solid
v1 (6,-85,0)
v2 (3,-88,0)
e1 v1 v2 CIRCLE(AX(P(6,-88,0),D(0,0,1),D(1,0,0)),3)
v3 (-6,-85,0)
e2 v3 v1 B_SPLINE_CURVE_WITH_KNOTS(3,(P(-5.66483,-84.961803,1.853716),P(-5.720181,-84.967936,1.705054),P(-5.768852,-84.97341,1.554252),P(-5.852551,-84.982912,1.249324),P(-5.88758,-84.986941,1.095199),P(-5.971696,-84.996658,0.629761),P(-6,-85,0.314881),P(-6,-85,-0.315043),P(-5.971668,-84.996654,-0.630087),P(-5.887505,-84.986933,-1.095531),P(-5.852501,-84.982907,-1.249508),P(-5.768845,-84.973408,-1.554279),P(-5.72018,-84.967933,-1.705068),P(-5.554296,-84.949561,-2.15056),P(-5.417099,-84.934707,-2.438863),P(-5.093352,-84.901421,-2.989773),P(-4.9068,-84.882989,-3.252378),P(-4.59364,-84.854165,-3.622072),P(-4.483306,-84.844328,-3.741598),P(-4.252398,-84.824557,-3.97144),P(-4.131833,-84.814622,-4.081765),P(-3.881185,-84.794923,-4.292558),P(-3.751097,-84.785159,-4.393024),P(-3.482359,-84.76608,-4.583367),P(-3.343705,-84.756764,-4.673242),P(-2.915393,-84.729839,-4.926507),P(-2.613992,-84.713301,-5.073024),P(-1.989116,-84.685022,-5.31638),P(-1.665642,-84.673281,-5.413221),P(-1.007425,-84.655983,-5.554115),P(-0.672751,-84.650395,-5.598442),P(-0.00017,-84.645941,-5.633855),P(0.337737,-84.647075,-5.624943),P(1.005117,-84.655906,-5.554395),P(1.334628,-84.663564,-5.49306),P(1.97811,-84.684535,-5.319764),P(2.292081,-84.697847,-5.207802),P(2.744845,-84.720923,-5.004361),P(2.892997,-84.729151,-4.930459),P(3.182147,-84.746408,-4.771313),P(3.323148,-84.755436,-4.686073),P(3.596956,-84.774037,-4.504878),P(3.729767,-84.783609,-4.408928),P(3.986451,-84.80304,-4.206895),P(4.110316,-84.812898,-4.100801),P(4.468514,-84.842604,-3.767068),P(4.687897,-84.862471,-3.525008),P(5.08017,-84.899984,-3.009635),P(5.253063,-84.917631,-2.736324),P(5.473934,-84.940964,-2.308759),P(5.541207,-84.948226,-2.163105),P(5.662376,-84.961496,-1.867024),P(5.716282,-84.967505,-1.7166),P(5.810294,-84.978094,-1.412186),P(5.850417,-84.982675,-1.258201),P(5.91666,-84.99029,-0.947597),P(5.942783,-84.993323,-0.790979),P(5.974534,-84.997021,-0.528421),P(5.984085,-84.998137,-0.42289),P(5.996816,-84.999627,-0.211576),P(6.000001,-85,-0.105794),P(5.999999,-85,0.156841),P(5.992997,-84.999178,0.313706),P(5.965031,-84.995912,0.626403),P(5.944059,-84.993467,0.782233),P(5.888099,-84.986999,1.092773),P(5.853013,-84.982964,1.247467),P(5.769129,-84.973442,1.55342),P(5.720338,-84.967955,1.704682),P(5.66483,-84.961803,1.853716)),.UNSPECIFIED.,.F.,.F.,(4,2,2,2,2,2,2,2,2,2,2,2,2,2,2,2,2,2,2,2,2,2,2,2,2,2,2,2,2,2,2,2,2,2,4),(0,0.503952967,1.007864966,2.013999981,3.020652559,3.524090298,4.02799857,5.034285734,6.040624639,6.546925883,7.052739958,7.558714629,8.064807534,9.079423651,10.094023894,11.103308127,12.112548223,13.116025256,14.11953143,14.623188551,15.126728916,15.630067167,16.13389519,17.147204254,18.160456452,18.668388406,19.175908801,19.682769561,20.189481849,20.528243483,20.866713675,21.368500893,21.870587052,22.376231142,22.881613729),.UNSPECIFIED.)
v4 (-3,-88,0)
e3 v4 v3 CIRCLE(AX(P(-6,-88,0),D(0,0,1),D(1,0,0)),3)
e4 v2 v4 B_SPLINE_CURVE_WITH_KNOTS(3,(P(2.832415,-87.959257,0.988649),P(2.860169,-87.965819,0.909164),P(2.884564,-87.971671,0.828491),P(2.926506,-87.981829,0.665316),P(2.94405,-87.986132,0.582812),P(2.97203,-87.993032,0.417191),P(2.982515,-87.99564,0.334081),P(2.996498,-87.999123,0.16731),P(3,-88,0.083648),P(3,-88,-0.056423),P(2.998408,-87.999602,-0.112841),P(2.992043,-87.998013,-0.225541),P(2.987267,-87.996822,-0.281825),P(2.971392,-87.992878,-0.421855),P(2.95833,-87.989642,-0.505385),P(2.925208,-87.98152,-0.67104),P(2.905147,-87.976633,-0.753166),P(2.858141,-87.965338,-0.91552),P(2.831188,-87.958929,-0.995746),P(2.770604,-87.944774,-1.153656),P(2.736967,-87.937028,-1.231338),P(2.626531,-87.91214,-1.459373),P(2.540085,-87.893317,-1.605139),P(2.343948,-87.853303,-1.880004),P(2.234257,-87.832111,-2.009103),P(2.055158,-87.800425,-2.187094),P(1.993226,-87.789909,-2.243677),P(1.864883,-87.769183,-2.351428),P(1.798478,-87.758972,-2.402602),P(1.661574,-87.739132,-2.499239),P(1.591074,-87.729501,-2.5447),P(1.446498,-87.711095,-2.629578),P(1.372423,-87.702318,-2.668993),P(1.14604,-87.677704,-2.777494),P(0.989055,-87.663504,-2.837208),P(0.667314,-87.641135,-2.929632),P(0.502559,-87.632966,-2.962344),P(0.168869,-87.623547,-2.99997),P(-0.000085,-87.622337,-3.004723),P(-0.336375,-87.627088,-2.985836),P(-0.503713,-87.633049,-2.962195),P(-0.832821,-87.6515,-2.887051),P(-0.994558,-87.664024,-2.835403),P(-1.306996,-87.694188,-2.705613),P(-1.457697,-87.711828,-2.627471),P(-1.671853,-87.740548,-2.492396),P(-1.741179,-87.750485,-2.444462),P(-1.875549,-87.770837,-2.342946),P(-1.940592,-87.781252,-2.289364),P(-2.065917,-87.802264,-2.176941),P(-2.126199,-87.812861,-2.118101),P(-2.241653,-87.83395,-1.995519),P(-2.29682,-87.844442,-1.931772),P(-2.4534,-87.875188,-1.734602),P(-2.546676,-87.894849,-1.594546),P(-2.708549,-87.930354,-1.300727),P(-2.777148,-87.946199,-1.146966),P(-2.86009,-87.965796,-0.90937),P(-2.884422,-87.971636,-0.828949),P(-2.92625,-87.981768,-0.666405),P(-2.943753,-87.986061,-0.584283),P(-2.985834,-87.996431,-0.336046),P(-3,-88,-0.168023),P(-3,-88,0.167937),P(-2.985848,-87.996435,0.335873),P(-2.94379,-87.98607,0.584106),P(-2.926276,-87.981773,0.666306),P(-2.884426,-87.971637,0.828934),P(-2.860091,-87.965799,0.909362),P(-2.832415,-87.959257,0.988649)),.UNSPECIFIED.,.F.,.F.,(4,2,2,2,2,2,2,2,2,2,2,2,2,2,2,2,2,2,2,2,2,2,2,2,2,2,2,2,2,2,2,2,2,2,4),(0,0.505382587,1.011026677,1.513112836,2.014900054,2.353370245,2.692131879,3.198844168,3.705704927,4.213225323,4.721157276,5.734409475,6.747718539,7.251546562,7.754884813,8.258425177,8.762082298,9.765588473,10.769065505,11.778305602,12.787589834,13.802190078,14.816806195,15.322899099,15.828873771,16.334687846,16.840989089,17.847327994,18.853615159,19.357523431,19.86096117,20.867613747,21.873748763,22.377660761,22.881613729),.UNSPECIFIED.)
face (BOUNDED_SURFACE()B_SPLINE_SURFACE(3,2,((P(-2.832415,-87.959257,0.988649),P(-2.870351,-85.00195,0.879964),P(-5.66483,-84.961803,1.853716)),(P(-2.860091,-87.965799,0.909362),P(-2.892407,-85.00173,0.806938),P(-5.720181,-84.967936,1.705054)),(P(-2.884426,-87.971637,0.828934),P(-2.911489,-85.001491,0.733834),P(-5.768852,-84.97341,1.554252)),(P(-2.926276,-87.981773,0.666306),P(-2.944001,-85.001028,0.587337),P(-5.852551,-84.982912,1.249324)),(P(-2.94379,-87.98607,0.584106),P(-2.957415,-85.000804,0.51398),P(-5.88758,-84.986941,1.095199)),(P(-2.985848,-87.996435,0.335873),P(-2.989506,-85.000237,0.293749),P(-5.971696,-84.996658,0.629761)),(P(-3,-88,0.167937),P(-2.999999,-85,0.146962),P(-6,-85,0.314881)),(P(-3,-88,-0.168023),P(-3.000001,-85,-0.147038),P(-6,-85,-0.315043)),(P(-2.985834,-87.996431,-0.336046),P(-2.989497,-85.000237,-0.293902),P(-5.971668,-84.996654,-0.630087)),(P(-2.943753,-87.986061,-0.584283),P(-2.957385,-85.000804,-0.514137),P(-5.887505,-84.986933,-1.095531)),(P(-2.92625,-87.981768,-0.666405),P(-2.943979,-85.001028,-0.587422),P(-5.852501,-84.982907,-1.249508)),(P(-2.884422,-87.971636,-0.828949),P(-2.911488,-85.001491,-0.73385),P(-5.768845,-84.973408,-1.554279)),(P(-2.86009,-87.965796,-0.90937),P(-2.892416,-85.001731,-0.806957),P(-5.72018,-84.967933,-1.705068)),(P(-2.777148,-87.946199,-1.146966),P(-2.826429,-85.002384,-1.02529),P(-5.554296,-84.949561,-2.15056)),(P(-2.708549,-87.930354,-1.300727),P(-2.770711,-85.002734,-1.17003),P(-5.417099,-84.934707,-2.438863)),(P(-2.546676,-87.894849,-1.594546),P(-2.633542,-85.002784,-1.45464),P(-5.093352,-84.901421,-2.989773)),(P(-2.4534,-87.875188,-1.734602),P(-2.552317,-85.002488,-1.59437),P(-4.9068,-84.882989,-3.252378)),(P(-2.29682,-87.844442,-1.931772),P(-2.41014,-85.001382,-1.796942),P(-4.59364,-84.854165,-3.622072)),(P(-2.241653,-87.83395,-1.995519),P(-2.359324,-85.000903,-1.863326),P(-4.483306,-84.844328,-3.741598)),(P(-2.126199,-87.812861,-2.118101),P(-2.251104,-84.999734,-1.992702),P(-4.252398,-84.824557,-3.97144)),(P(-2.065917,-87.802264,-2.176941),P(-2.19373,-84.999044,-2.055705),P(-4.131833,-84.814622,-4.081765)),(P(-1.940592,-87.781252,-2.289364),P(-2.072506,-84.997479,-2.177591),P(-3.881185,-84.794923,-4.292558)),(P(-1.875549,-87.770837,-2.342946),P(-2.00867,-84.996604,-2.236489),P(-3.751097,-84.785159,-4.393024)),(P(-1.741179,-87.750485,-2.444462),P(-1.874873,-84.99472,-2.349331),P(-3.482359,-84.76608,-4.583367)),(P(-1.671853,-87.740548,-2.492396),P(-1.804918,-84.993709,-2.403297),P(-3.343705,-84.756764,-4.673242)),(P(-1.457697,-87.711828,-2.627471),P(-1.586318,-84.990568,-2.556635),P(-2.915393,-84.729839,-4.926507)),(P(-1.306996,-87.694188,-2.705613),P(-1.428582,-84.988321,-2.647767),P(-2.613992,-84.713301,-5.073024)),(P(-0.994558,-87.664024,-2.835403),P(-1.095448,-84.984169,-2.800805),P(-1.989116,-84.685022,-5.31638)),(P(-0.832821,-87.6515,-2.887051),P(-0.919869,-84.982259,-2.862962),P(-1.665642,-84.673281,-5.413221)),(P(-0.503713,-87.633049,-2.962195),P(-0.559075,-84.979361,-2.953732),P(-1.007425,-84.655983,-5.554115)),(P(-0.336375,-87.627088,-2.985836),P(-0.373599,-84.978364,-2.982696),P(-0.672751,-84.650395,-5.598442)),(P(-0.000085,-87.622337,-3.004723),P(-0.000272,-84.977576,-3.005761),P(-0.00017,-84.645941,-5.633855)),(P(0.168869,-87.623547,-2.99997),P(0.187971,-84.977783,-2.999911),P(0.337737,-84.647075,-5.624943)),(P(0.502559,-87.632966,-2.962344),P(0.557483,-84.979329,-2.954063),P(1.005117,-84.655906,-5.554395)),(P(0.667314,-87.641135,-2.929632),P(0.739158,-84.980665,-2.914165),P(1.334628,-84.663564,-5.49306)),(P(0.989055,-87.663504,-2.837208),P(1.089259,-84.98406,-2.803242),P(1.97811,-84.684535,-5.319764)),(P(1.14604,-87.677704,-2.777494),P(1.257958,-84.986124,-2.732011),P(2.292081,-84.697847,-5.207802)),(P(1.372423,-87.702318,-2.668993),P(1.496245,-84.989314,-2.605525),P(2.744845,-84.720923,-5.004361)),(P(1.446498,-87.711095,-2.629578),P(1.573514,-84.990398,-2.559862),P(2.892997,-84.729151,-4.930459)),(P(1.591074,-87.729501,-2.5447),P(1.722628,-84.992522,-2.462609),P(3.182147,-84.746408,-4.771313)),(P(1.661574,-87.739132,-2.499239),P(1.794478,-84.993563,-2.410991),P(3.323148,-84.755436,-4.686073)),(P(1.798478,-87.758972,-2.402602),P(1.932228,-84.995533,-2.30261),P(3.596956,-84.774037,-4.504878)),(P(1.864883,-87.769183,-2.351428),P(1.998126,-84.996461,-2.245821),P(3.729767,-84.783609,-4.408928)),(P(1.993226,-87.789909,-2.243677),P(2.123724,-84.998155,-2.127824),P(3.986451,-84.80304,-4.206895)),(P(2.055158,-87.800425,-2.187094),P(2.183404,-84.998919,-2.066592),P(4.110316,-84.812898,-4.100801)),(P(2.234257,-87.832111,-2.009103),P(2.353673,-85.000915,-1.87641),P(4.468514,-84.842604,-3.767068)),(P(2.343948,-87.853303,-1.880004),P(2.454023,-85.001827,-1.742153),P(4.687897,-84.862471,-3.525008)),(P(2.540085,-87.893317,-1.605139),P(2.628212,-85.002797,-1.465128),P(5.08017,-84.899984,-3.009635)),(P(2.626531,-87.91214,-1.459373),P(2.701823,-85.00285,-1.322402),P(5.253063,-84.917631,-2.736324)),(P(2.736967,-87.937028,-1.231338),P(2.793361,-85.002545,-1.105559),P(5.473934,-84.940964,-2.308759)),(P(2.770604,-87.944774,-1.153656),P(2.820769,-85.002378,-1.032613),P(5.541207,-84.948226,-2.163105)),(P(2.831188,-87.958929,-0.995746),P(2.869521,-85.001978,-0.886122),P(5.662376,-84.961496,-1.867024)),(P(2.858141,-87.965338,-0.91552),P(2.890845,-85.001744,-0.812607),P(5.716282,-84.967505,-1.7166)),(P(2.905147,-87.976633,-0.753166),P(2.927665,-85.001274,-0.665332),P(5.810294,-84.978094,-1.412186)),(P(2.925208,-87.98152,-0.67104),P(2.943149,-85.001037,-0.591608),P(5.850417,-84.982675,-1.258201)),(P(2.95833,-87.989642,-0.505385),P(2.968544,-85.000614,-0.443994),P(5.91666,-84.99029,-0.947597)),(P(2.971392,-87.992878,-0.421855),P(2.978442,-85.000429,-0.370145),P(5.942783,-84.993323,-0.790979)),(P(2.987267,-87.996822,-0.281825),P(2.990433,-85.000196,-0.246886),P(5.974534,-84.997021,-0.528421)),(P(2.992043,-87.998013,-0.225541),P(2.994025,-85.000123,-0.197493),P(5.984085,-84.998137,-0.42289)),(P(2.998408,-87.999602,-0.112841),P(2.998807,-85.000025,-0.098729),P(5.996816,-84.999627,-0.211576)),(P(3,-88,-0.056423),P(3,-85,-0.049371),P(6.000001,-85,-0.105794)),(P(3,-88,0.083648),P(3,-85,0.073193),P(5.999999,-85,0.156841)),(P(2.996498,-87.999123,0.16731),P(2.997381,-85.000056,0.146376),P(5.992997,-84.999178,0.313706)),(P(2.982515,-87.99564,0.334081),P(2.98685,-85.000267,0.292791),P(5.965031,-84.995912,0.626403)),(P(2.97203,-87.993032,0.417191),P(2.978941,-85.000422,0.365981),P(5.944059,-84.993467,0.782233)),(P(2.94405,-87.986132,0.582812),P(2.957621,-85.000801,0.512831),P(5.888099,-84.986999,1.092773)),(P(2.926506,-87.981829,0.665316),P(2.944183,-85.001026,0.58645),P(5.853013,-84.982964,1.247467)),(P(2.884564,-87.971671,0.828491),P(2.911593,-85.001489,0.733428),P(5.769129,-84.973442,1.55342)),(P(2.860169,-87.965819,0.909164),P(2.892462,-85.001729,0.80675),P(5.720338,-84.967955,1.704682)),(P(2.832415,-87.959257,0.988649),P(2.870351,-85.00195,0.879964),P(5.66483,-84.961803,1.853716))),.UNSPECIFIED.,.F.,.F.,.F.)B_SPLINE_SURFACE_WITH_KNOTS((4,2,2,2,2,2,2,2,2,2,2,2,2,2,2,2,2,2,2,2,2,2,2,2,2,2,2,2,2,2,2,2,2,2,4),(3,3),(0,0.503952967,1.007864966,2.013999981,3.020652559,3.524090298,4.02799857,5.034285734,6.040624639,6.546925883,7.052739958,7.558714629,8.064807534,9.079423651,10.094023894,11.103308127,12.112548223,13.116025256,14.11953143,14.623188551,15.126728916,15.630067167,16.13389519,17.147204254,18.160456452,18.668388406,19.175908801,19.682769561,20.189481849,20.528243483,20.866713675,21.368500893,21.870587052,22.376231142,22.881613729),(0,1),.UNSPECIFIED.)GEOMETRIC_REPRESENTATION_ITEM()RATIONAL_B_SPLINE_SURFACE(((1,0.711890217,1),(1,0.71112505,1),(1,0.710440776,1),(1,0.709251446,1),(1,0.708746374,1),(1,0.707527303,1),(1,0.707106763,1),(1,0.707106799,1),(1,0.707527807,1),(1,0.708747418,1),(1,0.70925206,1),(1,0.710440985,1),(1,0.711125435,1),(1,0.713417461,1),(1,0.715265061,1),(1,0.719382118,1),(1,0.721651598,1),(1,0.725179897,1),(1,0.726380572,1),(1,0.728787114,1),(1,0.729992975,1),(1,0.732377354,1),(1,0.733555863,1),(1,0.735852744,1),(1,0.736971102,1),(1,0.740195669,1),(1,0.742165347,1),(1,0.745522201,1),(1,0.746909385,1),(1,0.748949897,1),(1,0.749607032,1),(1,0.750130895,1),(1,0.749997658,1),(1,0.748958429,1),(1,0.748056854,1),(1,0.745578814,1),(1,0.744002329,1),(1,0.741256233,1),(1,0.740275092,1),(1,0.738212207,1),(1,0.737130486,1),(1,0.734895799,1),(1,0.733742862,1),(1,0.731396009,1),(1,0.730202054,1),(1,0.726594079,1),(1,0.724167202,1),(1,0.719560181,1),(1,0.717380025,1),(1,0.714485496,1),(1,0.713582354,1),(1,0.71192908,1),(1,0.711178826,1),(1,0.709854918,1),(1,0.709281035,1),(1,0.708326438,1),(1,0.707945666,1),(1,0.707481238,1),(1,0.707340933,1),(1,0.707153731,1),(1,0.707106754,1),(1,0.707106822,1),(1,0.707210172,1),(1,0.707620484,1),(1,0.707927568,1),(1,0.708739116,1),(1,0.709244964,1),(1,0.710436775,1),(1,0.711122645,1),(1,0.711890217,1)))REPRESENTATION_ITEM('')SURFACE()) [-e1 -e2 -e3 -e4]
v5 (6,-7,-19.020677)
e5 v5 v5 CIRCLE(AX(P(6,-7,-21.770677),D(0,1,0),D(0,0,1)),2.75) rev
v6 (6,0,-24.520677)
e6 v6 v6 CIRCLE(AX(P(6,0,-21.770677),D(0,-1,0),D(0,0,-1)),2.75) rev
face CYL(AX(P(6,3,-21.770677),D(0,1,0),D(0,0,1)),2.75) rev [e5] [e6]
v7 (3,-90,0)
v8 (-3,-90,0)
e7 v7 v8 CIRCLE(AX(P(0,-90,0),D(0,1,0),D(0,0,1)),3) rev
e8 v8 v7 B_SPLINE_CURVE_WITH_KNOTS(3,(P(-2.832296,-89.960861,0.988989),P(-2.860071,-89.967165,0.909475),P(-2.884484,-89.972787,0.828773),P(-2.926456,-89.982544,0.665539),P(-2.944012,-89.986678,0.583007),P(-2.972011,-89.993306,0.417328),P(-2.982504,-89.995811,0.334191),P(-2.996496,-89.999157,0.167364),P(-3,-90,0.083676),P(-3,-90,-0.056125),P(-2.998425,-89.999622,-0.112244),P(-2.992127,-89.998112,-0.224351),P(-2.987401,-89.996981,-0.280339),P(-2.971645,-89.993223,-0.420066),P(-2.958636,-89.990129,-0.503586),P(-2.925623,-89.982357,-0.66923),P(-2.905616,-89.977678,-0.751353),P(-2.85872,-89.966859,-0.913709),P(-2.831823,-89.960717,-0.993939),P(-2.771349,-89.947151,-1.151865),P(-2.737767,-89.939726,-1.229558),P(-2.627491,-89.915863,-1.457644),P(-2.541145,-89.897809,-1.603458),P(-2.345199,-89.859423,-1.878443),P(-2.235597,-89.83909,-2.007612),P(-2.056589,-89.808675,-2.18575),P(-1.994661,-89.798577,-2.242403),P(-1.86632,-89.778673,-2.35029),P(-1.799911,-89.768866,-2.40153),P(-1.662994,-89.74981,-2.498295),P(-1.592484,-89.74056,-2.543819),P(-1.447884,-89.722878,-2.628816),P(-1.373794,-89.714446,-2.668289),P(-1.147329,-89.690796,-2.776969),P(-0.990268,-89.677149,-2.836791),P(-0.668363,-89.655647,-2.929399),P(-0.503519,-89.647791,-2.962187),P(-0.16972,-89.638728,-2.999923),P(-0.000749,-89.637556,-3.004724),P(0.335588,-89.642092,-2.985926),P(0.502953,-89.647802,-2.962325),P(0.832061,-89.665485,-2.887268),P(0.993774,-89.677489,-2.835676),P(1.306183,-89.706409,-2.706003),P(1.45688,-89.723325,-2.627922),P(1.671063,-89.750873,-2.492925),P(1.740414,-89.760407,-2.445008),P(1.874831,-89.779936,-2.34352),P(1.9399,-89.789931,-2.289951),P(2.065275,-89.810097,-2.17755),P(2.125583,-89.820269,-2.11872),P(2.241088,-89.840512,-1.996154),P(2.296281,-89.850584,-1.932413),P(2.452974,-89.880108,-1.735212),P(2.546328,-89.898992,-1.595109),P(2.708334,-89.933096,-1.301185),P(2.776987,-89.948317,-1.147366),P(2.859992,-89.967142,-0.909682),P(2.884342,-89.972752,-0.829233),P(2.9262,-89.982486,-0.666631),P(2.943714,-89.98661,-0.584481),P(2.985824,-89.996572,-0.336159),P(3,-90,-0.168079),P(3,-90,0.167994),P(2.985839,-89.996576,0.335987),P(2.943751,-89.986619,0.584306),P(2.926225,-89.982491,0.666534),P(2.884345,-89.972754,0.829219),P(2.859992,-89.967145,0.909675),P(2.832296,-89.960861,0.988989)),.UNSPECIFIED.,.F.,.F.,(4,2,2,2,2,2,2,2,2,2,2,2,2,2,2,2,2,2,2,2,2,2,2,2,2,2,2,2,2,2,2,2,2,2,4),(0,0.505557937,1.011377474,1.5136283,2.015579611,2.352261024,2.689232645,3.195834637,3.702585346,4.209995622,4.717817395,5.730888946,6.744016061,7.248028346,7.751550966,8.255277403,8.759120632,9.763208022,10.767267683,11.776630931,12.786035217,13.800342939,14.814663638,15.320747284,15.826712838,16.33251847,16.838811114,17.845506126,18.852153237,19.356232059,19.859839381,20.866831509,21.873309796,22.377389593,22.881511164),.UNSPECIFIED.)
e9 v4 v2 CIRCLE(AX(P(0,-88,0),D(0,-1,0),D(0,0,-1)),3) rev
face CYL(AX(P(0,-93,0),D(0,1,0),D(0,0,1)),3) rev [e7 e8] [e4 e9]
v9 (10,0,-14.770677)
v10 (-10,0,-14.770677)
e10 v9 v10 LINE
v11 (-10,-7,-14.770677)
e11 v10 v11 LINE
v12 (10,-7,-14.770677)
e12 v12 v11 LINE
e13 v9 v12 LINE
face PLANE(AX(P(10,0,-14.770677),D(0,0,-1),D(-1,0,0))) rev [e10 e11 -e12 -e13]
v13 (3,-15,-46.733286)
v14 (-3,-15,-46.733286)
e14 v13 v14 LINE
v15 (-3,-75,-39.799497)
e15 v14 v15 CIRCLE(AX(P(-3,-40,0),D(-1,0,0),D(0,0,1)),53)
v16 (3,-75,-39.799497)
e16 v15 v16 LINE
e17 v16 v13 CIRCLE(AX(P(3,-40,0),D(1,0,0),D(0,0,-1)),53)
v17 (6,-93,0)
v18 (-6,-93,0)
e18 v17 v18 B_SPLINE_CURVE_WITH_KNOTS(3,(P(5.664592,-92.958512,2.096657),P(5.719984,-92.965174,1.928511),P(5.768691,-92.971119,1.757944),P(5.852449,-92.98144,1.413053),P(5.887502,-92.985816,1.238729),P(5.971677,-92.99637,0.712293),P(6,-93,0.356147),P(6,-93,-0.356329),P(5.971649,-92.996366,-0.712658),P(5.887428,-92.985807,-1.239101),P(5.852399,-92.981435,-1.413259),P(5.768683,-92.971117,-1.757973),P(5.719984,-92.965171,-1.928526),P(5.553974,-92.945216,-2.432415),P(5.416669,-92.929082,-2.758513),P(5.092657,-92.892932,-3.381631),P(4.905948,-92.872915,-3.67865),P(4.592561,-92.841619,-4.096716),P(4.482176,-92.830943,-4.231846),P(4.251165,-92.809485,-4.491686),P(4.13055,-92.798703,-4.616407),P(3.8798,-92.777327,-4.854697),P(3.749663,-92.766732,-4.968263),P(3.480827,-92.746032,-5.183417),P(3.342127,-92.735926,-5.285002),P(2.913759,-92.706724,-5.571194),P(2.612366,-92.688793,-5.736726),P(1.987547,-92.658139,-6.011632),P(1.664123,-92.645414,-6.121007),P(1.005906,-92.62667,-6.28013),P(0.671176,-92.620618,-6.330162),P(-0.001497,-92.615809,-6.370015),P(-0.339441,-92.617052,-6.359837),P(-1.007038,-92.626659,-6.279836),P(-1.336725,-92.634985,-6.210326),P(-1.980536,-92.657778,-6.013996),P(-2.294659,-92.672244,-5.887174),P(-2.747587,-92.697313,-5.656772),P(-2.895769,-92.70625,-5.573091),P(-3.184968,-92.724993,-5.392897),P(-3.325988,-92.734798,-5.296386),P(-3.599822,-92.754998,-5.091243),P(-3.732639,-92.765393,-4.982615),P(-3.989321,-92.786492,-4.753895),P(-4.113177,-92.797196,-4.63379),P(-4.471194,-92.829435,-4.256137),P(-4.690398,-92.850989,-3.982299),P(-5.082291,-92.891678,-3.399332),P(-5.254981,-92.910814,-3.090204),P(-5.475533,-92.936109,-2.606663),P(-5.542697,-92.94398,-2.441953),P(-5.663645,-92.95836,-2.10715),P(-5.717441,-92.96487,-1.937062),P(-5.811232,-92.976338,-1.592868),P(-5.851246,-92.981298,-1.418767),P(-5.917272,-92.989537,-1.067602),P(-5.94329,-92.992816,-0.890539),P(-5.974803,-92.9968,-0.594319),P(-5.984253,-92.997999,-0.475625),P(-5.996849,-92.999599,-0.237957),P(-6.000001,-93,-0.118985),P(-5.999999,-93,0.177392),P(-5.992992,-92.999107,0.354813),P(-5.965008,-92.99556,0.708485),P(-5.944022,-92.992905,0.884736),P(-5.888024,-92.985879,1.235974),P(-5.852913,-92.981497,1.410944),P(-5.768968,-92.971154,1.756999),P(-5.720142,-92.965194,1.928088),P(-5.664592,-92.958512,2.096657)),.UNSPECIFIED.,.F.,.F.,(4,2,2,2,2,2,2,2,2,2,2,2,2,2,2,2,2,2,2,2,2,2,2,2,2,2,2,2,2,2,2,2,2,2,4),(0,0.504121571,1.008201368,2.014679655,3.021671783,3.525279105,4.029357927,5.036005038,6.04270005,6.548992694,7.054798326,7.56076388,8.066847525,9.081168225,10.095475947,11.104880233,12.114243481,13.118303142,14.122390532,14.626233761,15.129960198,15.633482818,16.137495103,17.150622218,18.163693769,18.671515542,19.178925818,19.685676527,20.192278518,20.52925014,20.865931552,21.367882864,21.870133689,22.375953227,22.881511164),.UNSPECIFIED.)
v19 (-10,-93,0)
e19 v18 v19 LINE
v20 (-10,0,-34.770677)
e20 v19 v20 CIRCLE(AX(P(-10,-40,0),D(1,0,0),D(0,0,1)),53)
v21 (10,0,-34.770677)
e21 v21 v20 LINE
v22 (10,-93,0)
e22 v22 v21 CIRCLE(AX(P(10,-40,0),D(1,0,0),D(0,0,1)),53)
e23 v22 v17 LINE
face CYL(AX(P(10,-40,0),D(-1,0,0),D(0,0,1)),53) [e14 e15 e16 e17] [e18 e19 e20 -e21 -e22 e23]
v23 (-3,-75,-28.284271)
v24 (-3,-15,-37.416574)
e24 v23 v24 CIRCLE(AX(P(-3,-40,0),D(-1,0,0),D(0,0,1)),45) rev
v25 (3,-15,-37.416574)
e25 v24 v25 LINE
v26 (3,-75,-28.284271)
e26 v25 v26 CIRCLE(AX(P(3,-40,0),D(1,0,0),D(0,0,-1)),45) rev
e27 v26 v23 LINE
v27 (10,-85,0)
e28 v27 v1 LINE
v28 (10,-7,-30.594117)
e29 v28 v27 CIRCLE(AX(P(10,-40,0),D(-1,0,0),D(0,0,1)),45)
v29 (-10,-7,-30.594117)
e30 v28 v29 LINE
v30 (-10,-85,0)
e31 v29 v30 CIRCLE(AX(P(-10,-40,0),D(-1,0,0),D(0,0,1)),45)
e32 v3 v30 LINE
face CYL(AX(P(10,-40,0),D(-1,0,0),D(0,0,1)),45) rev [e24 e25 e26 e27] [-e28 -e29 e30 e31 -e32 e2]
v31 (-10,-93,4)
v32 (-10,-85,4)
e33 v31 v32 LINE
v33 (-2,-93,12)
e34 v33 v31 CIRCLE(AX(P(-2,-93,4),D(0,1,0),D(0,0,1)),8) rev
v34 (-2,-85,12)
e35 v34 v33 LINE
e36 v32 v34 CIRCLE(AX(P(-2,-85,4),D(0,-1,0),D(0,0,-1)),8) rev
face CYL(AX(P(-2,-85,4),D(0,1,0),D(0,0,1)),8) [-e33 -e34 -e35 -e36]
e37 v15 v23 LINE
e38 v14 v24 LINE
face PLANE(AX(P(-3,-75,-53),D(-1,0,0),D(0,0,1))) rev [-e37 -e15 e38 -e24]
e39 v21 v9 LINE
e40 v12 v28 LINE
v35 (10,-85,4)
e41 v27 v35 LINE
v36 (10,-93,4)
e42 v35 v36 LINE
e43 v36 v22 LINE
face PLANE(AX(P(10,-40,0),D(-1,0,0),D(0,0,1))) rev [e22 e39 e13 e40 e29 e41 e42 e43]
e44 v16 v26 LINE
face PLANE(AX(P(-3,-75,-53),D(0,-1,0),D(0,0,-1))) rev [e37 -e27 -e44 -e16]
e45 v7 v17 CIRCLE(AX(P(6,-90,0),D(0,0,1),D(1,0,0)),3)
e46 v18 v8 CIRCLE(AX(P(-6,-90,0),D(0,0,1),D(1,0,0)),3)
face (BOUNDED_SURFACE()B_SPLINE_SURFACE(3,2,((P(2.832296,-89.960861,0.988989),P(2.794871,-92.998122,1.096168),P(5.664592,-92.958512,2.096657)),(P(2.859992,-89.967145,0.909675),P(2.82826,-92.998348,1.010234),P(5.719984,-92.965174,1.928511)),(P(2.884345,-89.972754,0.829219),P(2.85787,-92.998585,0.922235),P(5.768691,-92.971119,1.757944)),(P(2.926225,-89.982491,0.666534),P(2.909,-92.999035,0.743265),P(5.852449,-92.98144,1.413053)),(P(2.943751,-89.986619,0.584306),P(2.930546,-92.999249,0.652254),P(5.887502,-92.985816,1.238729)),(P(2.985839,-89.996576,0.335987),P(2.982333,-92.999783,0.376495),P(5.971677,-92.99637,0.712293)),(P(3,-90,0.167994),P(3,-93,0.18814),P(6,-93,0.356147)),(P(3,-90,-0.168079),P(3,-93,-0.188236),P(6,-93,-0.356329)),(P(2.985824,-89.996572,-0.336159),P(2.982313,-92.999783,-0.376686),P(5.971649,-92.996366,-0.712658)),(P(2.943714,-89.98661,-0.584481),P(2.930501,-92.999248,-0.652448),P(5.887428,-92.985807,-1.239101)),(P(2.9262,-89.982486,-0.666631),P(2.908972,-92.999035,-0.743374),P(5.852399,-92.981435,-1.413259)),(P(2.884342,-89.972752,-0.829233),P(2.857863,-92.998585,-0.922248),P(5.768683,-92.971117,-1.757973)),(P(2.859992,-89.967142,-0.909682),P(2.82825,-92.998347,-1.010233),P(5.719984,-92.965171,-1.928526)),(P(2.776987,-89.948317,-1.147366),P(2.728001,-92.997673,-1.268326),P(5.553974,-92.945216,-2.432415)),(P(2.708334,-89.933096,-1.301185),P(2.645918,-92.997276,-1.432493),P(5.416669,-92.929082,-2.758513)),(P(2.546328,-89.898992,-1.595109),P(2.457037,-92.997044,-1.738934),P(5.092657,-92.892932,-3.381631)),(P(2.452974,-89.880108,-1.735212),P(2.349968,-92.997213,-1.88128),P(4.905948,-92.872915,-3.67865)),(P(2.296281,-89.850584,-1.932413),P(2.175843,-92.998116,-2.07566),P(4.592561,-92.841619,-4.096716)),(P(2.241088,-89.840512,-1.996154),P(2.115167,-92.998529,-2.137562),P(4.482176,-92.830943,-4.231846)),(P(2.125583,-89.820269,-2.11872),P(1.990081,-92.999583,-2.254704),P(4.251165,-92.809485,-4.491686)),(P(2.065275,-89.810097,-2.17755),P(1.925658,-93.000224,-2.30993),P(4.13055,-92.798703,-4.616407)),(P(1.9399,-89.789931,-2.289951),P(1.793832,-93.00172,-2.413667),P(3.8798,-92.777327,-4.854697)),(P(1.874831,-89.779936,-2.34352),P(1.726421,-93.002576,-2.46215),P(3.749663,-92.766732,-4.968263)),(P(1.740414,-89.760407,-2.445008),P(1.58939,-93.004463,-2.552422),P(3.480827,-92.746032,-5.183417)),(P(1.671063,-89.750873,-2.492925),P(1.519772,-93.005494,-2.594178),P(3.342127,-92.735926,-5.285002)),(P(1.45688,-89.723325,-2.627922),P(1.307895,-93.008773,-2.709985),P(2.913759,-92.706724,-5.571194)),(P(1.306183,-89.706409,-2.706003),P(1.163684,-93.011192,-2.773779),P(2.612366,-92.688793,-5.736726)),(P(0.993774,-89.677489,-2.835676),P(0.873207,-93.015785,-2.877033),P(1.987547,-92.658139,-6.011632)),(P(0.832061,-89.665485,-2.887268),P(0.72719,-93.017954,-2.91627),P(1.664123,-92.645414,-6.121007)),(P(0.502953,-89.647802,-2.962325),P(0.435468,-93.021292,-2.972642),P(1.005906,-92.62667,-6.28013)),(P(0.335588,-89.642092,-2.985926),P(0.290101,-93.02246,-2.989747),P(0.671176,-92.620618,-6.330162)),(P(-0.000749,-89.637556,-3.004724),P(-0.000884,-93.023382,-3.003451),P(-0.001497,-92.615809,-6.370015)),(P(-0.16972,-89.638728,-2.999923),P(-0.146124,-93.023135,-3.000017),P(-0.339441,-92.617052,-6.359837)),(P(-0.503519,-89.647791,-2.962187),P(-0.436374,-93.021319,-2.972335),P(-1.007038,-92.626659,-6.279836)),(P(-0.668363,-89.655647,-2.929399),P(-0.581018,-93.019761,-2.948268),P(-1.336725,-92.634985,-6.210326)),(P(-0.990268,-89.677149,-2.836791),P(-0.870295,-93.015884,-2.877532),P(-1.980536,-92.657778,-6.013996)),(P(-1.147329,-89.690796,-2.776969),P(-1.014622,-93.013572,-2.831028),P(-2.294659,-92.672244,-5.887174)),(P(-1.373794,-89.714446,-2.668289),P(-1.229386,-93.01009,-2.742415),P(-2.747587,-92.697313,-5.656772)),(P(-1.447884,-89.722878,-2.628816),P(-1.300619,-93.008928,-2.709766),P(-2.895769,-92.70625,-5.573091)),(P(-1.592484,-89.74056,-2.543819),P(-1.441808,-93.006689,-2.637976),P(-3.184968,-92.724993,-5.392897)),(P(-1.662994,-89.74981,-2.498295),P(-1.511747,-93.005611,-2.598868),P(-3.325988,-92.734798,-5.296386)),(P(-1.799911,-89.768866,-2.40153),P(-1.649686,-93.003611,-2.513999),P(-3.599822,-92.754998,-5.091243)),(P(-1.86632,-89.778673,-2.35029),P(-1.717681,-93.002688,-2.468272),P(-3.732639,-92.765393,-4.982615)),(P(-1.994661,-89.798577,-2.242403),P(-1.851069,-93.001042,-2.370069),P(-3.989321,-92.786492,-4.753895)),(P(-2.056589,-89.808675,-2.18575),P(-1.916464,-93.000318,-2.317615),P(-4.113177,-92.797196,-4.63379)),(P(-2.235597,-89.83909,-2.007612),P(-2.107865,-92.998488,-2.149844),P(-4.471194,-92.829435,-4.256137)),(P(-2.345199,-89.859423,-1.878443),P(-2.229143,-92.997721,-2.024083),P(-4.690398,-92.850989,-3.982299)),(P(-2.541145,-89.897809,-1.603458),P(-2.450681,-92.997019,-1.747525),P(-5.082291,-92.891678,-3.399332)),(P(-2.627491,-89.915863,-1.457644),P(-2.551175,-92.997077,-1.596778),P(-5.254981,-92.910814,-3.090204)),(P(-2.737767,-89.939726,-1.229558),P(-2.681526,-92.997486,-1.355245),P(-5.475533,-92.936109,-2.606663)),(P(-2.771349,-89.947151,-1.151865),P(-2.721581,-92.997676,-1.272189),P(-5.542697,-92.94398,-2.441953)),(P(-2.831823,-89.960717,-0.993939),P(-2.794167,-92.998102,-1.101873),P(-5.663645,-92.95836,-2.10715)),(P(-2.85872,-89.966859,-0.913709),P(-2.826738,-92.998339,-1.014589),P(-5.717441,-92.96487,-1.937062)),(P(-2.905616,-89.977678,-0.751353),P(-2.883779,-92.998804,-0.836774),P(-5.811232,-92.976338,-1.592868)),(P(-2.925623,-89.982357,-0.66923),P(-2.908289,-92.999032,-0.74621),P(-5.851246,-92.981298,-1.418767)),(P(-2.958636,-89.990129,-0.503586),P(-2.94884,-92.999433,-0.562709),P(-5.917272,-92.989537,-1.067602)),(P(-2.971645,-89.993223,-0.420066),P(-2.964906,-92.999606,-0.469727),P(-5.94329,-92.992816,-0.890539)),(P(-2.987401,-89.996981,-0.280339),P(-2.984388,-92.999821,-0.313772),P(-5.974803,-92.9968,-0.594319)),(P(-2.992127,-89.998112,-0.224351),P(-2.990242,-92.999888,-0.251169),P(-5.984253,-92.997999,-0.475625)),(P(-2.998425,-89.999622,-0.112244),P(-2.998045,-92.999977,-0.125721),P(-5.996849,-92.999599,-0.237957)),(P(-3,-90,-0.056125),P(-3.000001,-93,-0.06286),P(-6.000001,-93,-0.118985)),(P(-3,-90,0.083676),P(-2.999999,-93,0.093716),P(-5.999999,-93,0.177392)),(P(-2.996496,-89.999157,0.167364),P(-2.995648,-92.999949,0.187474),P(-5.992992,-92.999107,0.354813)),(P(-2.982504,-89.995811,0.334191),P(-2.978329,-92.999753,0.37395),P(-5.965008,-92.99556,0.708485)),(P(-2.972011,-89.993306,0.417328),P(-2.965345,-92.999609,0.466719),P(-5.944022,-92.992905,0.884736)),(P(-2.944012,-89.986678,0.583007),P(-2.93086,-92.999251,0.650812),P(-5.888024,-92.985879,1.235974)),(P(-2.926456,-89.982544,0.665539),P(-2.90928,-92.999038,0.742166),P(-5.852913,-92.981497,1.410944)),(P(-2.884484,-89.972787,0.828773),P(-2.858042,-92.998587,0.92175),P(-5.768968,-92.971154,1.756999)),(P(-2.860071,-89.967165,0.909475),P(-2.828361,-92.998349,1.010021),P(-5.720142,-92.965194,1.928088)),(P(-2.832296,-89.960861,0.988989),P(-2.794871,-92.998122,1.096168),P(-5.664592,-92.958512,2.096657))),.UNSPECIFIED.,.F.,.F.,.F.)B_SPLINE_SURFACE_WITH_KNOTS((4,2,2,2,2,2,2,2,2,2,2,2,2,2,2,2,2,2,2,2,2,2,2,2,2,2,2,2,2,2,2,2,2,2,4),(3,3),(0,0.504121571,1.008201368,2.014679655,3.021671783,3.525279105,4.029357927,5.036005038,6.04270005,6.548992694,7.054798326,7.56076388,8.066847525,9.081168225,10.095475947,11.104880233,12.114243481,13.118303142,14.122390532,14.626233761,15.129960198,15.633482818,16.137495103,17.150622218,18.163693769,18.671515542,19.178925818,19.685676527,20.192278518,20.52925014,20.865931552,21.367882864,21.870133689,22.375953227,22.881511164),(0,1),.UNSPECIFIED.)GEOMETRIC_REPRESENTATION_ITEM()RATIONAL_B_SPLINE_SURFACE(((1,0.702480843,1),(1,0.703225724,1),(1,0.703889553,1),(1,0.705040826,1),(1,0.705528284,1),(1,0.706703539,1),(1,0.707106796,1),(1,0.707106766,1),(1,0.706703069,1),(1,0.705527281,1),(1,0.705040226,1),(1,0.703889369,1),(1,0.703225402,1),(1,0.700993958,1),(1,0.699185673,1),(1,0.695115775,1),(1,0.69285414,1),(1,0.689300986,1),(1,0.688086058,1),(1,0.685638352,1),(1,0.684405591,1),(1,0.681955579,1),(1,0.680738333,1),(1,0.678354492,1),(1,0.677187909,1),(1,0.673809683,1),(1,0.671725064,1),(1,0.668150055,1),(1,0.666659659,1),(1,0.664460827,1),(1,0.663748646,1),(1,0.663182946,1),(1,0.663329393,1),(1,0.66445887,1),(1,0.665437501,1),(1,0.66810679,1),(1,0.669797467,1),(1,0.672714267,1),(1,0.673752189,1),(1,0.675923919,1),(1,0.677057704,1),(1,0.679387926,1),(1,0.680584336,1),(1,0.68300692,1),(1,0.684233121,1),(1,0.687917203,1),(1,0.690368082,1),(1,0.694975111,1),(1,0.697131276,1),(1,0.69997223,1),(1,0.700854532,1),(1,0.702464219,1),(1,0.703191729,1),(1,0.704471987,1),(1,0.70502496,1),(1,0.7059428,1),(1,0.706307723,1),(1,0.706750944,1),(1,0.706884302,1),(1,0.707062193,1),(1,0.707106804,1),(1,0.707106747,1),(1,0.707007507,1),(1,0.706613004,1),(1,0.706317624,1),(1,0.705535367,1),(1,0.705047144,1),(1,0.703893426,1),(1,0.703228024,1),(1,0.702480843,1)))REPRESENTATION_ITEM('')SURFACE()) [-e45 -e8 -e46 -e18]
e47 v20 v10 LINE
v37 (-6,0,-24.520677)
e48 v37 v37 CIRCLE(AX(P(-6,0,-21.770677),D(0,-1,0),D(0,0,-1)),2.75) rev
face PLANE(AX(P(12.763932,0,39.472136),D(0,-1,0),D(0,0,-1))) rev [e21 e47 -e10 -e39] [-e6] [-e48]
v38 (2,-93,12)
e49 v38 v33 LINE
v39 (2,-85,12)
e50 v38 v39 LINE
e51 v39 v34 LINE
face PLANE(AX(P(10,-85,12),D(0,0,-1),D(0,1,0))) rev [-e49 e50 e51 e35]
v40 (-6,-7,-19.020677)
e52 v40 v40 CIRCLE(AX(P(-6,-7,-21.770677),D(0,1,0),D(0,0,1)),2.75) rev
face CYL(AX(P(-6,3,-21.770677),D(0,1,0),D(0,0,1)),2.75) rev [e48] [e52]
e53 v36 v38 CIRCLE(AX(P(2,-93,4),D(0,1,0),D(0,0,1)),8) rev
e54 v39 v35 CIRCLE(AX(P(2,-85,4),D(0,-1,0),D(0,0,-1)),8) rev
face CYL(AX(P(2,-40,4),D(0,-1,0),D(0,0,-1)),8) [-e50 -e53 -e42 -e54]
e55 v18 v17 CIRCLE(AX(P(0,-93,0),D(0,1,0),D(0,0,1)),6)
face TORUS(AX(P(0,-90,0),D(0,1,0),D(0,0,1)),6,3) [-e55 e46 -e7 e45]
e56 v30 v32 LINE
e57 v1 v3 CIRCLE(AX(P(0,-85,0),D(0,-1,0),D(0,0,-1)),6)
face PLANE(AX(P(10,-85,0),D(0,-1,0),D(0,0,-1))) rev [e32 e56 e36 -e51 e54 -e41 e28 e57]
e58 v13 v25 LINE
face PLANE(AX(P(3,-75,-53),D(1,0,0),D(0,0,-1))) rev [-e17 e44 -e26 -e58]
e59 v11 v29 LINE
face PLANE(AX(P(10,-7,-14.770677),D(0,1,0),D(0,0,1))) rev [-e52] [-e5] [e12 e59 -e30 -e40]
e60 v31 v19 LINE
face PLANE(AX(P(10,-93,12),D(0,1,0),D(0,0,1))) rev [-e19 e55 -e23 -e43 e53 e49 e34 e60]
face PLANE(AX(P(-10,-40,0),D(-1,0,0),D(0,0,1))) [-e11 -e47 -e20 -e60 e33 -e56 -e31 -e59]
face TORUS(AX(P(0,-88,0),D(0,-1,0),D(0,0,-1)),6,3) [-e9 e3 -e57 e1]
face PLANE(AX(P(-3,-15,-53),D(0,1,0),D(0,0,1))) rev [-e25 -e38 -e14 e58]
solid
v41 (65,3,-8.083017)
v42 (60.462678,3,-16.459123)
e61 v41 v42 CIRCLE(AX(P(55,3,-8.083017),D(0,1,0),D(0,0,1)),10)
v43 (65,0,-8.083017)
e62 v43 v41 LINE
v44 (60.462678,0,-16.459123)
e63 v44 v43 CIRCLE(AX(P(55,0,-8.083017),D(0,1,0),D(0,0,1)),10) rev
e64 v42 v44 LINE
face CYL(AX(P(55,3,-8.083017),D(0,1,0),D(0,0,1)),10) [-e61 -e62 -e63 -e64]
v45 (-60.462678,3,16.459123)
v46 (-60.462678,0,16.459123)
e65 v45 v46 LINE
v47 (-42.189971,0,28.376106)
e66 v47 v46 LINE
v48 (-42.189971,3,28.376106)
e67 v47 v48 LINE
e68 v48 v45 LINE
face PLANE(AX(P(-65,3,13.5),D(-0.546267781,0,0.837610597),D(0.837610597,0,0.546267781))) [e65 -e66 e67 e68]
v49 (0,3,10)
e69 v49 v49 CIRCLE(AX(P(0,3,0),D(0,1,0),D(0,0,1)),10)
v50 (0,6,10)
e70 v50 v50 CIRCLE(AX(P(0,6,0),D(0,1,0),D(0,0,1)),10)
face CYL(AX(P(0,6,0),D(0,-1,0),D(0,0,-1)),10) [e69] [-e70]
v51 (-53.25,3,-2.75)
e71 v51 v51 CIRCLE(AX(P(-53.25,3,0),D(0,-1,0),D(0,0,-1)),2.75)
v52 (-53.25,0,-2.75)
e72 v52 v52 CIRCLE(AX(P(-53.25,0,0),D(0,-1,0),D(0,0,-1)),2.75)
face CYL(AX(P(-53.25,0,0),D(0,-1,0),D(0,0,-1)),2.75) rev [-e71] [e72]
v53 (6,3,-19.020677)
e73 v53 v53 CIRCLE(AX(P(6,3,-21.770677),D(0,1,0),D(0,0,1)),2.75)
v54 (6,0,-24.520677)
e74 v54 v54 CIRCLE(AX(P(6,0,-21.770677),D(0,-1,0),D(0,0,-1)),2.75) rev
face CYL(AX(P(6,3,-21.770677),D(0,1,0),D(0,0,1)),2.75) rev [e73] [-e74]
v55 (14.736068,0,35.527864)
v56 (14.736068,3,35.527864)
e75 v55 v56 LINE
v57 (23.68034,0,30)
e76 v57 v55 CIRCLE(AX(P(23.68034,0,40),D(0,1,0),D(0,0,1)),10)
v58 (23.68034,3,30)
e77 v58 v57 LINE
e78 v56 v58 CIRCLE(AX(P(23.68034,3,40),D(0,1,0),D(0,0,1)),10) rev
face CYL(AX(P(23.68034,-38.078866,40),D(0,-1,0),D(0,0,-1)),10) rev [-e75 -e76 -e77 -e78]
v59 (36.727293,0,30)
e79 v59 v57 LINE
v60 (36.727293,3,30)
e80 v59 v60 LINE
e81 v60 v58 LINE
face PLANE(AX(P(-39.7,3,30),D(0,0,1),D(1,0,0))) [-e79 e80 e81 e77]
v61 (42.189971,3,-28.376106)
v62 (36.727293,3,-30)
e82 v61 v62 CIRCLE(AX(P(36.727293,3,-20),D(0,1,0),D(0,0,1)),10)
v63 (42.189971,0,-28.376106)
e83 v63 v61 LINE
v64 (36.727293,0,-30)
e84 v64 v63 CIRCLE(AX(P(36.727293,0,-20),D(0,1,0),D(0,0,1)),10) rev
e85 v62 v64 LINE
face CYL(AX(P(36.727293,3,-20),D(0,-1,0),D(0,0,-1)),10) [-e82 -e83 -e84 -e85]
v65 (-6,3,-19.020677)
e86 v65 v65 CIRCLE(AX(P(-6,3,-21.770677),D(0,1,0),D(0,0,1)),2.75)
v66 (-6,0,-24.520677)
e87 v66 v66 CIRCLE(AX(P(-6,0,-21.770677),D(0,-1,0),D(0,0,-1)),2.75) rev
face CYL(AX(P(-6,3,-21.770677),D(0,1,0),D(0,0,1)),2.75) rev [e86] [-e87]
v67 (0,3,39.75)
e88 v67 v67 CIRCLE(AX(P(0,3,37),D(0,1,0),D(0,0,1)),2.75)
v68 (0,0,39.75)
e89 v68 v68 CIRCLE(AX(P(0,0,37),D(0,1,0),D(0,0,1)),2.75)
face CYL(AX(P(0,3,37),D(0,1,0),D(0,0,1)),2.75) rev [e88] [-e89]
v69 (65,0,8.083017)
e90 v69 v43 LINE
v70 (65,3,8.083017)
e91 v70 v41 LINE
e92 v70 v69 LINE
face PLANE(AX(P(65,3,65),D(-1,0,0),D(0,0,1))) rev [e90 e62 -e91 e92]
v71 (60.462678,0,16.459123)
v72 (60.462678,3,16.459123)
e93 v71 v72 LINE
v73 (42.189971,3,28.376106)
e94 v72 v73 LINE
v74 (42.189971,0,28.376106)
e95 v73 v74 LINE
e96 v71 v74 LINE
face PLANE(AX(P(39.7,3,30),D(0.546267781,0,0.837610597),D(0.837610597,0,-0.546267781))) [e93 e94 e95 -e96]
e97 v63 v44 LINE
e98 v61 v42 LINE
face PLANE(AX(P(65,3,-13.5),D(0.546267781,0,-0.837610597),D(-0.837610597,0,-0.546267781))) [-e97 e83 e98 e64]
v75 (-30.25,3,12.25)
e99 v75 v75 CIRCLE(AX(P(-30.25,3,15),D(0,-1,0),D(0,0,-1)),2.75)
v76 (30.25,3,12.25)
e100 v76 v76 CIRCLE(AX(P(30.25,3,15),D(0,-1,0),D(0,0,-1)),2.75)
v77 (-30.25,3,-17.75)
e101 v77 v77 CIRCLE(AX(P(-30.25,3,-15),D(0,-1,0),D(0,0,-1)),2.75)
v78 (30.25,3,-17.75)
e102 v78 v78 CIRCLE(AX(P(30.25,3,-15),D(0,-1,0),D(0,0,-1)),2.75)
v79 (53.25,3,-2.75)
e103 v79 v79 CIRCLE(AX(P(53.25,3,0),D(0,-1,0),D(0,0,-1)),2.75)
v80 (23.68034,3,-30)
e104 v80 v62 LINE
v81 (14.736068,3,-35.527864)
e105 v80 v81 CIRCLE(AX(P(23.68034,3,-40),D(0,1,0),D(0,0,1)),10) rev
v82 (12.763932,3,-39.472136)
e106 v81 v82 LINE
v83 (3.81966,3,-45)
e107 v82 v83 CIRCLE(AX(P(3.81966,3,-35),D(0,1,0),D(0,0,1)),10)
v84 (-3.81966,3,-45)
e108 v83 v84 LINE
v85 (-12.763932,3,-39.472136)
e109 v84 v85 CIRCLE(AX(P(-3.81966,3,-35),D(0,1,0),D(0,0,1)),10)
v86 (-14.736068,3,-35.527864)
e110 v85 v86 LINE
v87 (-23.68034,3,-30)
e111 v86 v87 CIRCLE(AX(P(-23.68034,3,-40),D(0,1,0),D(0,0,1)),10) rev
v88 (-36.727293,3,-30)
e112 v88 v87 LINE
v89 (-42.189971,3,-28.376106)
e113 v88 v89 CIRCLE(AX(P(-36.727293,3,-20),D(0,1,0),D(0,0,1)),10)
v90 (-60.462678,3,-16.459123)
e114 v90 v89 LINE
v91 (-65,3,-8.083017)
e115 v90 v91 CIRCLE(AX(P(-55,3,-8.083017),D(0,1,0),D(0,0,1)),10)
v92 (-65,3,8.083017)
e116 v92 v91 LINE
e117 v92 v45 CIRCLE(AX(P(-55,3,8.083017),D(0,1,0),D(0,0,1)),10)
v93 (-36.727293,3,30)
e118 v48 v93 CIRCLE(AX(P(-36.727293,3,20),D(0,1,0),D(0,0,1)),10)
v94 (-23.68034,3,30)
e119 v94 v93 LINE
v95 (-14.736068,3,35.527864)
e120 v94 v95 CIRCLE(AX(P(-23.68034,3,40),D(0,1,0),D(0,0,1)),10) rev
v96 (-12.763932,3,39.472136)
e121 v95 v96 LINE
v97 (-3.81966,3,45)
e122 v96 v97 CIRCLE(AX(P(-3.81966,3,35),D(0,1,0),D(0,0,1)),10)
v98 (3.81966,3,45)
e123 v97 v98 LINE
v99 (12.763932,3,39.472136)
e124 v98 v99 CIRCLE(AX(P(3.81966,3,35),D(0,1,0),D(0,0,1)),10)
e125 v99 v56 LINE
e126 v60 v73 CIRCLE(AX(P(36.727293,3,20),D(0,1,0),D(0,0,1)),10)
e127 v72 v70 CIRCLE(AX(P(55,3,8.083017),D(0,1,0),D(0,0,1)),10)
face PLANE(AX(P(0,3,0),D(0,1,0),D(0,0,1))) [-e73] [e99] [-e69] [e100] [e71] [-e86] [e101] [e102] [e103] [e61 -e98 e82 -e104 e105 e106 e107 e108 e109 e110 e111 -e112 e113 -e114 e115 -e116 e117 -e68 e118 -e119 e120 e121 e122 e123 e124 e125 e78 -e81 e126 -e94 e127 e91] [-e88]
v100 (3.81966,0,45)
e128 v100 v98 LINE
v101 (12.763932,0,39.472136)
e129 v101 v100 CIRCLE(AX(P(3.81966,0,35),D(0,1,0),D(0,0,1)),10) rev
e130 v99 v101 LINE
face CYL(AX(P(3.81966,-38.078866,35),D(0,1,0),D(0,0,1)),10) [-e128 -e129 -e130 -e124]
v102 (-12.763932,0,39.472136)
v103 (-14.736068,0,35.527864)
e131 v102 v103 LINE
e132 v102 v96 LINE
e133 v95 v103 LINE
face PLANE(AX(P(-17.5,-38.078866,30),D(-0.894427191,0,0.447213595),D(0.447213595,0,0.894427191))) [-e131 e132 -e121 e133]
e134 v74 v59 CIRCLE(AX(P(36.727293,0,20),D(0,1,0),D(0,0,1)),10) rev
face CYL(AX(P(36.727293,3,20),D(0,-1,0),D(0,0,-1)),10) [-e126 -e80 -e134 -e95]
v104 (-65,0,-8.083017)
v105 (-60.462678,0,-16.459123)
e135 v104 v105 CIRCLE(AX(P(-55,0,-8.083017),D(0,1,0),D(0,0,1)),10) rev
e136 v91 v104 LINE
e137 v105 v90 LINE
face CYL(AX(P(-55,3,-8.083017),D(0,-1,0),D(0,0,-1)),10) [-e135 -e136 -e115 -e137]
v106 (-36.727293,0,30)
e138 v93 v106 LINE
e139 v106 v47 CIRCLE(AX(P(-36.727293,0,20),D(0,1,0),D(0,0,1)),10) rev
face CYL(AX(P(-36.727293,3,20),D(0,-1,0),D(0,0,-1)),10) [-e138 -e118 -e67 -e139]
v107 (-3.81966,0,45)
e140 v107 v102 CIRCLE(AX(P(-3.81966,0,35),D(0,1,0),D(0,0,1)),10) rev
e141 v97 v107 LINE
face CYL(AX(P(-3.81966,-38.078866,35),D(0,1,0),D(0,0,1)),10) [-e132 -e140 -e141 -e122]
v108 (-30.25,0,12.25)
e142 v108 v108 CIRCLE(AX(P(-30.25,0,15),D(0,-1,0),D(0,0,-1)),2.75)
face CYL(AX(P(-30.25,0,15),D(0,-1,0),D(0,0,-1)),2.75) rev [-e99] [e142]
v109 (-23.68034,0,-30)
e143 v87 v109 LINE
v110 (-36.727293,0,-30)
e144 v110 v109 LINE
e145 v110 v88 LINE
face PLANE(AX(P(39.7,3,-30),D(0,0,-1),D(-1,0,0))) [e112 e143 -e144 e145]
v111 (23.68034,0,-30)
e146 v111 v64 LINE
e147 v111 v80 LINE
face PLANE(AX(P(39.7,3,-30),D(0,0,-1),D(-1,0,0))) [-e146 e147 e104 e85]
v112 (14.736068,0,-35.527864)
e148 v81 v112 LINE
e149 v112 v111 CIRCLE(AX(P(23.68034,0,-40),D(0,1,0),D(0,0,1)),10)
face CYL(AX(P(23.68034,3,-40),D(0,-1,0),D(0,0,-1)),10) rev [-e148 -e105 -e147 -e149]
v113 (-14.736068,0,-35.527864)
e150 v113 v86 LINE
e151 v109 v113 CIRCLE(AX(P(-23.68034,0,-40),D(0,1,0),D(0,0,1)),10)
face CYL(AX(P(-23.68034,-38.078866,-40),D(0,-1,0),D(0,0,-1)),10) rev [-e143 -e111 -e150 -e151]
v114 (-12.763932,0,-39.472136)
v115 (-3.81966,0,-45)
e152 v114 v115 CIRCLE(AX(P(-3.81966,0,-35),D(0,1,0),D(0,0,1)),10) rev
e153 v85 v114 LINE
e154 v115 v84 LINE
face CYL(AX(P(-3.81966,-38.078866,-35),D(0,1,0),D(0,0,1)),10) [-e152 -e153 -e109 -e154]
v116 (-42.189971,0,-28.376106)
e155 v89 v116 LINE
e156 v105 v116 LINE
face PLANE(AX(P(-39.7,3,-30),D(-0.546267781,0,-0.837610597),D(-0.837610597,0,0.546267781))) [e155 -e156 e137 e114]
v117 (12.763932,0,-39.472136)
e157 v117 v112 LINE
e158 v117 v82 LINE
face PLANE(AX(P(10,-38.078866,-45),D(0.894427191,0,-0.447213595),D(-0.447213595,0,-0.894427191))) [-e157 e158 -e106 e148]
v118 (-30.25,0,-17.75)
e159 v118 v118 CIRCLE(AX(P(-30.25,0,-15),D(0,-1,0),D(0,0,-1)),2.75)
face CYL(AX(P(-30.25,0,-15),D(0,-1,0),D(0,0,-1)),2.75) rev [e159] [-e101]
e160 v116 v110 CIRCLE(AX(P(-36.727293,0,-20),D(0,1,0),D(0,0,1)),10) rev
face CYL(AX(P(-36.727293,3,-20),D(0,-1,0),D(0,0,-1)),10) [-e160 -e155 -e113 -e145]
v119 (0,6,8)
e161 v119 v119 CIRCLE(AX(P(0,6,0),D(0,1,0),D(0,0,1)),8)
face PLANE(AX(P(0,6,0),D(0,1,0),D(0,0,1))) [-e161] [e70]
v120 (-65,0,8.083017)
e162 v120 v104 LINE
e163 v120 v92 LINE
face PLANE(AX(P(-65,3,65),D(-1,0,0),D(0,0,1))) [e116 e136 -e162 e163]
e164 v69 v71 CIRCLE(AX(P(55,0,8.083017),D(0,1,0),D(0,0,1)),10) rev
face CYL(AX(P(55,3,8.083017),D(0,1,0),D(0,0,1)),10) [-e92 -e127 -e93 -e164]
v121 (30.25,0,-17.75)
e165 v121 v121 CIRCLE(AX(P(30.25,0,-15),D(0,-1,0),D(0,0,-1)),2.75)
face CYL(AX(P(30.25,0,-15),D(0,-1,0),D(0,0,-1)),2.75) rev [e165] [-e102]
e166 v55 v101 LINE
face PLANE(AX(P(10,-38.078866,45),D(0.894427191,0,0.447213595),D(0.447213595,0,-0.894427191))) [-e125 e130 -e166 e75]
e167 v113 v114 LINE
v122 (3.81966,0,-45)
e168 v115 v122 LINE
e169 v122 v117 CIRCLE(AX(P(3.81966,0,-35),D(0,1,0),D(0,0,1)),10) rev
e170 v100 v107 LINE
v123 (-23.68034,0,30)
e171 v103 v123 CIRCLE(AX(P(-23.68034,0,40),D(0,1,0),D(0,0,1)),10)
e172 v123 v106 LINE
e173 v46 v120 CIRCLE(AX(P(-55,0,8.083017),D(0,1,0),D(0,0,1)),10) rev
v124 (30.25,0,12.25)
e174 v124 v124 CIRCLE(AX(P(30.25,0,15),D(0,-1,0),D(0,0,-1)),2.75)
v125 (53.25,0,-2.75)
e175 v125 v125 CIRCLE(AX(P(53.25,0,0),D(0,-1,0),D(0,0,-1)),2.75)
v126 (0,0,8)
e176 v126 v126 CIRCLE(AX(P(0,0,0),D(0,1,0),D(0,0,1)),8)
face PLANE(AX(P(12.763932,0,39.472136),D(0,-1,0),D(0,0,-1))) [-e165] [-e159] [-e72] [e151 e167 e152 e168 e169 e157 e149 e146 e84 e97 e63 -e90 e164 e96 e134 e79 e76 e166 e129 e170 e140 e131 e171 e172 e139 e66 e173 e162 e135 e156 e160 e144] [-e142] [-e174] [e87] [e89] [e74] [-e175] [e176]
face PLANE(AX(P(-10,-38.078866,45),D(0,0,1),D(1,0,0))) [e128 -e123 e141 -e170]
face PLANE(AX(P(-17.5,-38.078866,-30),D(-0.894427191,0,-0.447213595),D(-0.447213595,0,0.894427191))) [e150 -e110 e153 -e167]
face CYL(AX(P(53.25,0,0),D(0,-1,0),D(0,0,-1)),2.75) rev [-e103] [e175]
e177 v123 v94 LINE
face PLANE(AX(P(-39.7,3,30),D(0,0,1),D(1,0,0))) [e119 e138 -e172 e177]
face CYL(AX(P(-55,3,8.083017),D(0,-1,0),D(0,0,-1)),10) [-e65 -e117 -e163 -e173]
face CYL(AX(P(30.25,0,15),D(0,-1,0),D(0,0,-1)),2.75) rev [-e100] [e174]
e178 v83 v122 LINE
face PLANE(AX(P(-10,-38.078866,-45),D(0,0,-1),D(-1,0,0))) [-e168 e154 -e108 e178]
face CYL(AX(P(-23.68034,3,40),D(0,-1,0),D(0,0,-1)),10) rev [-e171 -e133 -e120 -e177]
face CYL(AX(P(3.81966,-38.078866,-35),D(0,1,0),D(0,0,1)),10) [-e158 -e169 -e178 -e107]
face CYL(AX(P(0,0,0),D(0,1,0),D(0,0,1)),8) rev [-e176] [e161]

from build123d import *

# Parameters (mm, degrees)
SKETCH1_W                = 130
SKETCH1_H                = 130
BOSS_EXTRUDE1_DEPTH      = 3
SKETCH2_R                = 8
CUT_EXTRUDE1_DEPTH       = 3
M5_CLEARANCE_HOLE1_D     = 5.5
SKETCH5_OUTSIDE_W        = 168.774
SKETCH5_OUTSIDE_H        = 168.774
CUT_EXTRUDE2_DEPTH       = 92.972822073
BOSS_EXTRUDE2_DEPTH      = 3
FILLET1_R                = 10
M5_CLEARANCE_HOLE2_D     = 5.5
BOSS_EXTRUDE3_START      = 3
SKETCH9_R                = 10
SKETCH9_R_2              = 8
BOSS_EXTRUDE3_DEPTH      = 3
BOSS_EXTRUDE4_DEPTH      = 10
FILLET3_R                = 8
SKETCH12_W               = 6
SKETCH12_H               = 60
CUT_EXTRUDE4_DEPTH       = 126.231785103
CUT_EXTRUDE5_DEPTH       = 124.753787821
CUT_EXTRUDE5_DEPTH_BACK  = 124.753787821
SKETCH13_R               = 3
FILLET4_R                = 3
M5_CLEARANCE_HOLE3_D     = 5.5
M5_CLEARANCE_HOLE3_DEPTH = 10
M5_CLEARANCE_HOLE3_TIP   = 1.652366702


# Read off the part's stored shape, not the designer's step: Split1
with BuildPart() as part:
    # Sketch1 → Boss-Extrude1 (new body)
    with BuildSketch(Plane(origin=(0, 0, 0), x_dir=(1, 0, 0), z_dir=(0, 1, 0))):
        Rectangle(SKETCH1_W, SKETCH1_H)
    extrude(amount=BOSS_EXTRUDE1_DEPTH)

    # Sketch2 → Cut-Extrude1 (cut)
    with BuildSketch(Plane(origin=(0, 3, 0), x_dir=(1, 0, 0), z_dir=(0, 1, 0))):
        with Locations(Location((0, 0, 0), (0, 0, 270))):
            Circle(SKETCH2_R)
    extrude(amount=-CUT_EXTRUDE1_DEPTH, mode=Mode.SUBTRACT)

    # M5 Clearance Hole1 (through all)
    with Locations(Plane(origin=(0, 0, 0), x_dir=(-1, 0, 0), z_dir=(0, -1, 0))):
        with Locations((30.25, 15), (53.25, 0), (30.25, -15), (-30.25, -15), (-53.25, 0), (-30.25, 15)):
            Hole(M5_CLEARANCE_HOLE1_D / 2)

    # Sketch5 outside → Cut-Extrude2 (cut, through all)
    with BuildSketch(Plane.XZ):
        Rectangle(SKETCH5_OUTSIDE_W, SKETCH5_OUTSIDE_H)
        Polygon((-65, 13.5), (-39.7, 30), (39.7, 30), (65, 13.5), (65, -13.5), (39.7, -30), (-39.7, -30), (-65, -13.5), align=None, mode=Mode.SUBTRACT)
    extrude(amount=-CUT_EXTRUDE2_DEPTH, mode=Mode.SUBTRACT)

    # Sketch6 → Boss-Extrude2 (add)
    with BuildSketch(Plane(origin=(0, 3, 0), x_dir=(1, 0, 0), z_dir=(0, 1, 0))):
        Polygon((-17.5, 30), (-10, 45), (10, 45), (17.5, 30), align=None)
        Polygon((-17.5, -30), (17.5, -30), (10, -45), (-10, -45), align=None)
    extrude(amount=-BOSS_EXTRUDE2_DEPTH)

    # Fillet1
    fillet1_edges = [part.edges().sort_by_distance(p)[0] for p in [
        (-17.5, 1.5, -30),
        (-10, 1.5, -45),
        (10, 1.5, -45),
        (-10, 1.5, 45),
        (-17.5, 1.5, 30),
        (17.5, 1.5, 30),
        (10, 1.5, 45),
        (-65, 1.5, 13.5),
        (-39.7, 1.5, 30),
        (39.7, 1.5, 30),
        (65, 1.5, 13.5),
        (65, 1.5, -13.5),
        (39.7, 1.5, -30),
        (-39.7, 1.5, -30),
        (-65, 1.5, -13.5),
        (17.5, 1.5, -30),
    ]]
    fillet(fillet1_edges, radius=FILLET1_R)

    # M5 Clearance Hole2 (through all)
    with Locations(Plane(origin=(0, 3, 0), x_dir=(1, 0, 0), z_dir=(0, 1, 0))):
        with Locations((0, -37)):
            Hole(M5_CLEARANCE_HOLE2_D / 2)

    # Sketch9 → Boss-Extrude3 (add)
    with BuildSketch(Plane(origin=(0, 3, 0), x_dir=(1, 0, 0), z_dir=(0, 1, 0)).offset(BOSS_EXTRUDE3_START)):
        with Locations(Location((0, 0, 0), (0, 0, 270))):
            Circle(SKETCH9_R)
        with Locations(Location((0, 0, 0), (0, 0, 270))):
            Circle(SKETCH9_R_2, mode=Mode.SUBTRACT)
    extrude(amount=-BOSS_EXTRUDE3_DEPTH)

    # Sketch11 → Boss-Extrude4 (add, symmetric)
    with BuildSketch(Plane(origin=(0, 0, 0), x_dir=(0, 0, -1), z_dir=(1, 0, 0))):
        with BuildLine():
            Line((14.770677301, 0), (34.770677301, 0))
            ThreePointArc((34.770677301, 0), (49.643730722, -58.560711193), (0, -93))
            Line((0, -93), (-12, -93))
            Line((-12, -93), (-12, -85))
            Line((-12, -85), (0, -85))
            ThreePointArc((0, -85), (41.892720131, -56.431676725), (30.594117082, -7))
            Line((30.594117082, -7), (14.770677301, -7))
            Line((14.770677301, -7), (14.770677301, 0))
        make_face()
    extrude(amount=BOSS_EXTRUDE4_DEPTH, both=True)

    # Fillet3
    fillet3_edges = [part.edges().sort_by_distance(p)[0] for p in [
        (-10, -89, 12),
        (10, -89, 12),
    ]]
    fillet(fillet3_edges, radius=FILLET3_R)

    # Sketch12 → Cut-Extrude4 (cut, through all)
    with BuildSketch(Plane.XY):
        with Locations((0, -45)):
            Rectangle(SKETCH12_W, SKETCH12_H)
    extrude(amount=-CUT_EXTRUDE4_DEPTH, mode=Mode.SUBTRACT)

    # Sketch13 → Cut-Extrude5 (cut, two sides: drawn at the far end of the back side and taken through both)
    with BuildSketch(Plane(origin=(0, -85, 0), x_dir=(1, 0, 0), z_dir=(0, 1, 0)).offset(-CUT_EXTRUDE5_DEPTH_BACK)):
        with Locations(Location((0, 0, 0), (0, 0, 180))):
            Circle(SKETCH13_R)
    extrude(amount=CUT_EXTRUDE5_DEPTH + CUT_EXTRUDE5_DEPTH_BACK, mode=Mode.SUBTRACT)

    # Fillet4
    fillet4_edges = [part.edges().sort_by_distance(p)[0] for p in [
        (0, -92.915026222, -2.999999998),
        (0, -93, 3),
        (0, -85, 3),
        (0, -84.899888642, -2.999999998),
    ]]
    fillet(fillet4_edges, radius=FILLET4_R)

    # M5 Clearance Hole3
    with Locations(Plane(origin=(0, 3, 0), x_dir=(1, 0, 0), z_dir=(0, 1, 0))):
        with Locations((-6, 21.770677301), (6, 21.770677301)):
            Hole(M5_CLEARANCE_HOLE3_D / 2, depth=M5_CLEARANCE_HOLE3_DEPTH)
            with Locations((0, 0, -(M5_CLEARANCE_HOLE3_DEPTH + M5_CLEARANCE_HOLE3_TIP / 2))):  # 118° drill point
                Cone(0, M5_CLEARANCE_HOLE3_D / 2, M5_CLEARANCE_HOLE3_TIP, mode=Mode.SUBTRACT)


with BuildPart() as body_2:
    # Split1: the piece on the far side of the plane
    add(part.part)
    split(bisect_by=Plane(origin=(0, 0, 0), x_dir=(1, 0, 0), z_dir=(0, 1, 0)), keep=Keep.BOTTOM)


with BuildPart() as part_1:
    add(part.part)

    # Split1
    split(bisect_by=Plane(origin=(0, 0, 0), x_dir=(1, 0, 0), z_dir=(0, 1, 0)), keep=Keep.TOP)


solid = Compound([body_2.part, part_1.part])
